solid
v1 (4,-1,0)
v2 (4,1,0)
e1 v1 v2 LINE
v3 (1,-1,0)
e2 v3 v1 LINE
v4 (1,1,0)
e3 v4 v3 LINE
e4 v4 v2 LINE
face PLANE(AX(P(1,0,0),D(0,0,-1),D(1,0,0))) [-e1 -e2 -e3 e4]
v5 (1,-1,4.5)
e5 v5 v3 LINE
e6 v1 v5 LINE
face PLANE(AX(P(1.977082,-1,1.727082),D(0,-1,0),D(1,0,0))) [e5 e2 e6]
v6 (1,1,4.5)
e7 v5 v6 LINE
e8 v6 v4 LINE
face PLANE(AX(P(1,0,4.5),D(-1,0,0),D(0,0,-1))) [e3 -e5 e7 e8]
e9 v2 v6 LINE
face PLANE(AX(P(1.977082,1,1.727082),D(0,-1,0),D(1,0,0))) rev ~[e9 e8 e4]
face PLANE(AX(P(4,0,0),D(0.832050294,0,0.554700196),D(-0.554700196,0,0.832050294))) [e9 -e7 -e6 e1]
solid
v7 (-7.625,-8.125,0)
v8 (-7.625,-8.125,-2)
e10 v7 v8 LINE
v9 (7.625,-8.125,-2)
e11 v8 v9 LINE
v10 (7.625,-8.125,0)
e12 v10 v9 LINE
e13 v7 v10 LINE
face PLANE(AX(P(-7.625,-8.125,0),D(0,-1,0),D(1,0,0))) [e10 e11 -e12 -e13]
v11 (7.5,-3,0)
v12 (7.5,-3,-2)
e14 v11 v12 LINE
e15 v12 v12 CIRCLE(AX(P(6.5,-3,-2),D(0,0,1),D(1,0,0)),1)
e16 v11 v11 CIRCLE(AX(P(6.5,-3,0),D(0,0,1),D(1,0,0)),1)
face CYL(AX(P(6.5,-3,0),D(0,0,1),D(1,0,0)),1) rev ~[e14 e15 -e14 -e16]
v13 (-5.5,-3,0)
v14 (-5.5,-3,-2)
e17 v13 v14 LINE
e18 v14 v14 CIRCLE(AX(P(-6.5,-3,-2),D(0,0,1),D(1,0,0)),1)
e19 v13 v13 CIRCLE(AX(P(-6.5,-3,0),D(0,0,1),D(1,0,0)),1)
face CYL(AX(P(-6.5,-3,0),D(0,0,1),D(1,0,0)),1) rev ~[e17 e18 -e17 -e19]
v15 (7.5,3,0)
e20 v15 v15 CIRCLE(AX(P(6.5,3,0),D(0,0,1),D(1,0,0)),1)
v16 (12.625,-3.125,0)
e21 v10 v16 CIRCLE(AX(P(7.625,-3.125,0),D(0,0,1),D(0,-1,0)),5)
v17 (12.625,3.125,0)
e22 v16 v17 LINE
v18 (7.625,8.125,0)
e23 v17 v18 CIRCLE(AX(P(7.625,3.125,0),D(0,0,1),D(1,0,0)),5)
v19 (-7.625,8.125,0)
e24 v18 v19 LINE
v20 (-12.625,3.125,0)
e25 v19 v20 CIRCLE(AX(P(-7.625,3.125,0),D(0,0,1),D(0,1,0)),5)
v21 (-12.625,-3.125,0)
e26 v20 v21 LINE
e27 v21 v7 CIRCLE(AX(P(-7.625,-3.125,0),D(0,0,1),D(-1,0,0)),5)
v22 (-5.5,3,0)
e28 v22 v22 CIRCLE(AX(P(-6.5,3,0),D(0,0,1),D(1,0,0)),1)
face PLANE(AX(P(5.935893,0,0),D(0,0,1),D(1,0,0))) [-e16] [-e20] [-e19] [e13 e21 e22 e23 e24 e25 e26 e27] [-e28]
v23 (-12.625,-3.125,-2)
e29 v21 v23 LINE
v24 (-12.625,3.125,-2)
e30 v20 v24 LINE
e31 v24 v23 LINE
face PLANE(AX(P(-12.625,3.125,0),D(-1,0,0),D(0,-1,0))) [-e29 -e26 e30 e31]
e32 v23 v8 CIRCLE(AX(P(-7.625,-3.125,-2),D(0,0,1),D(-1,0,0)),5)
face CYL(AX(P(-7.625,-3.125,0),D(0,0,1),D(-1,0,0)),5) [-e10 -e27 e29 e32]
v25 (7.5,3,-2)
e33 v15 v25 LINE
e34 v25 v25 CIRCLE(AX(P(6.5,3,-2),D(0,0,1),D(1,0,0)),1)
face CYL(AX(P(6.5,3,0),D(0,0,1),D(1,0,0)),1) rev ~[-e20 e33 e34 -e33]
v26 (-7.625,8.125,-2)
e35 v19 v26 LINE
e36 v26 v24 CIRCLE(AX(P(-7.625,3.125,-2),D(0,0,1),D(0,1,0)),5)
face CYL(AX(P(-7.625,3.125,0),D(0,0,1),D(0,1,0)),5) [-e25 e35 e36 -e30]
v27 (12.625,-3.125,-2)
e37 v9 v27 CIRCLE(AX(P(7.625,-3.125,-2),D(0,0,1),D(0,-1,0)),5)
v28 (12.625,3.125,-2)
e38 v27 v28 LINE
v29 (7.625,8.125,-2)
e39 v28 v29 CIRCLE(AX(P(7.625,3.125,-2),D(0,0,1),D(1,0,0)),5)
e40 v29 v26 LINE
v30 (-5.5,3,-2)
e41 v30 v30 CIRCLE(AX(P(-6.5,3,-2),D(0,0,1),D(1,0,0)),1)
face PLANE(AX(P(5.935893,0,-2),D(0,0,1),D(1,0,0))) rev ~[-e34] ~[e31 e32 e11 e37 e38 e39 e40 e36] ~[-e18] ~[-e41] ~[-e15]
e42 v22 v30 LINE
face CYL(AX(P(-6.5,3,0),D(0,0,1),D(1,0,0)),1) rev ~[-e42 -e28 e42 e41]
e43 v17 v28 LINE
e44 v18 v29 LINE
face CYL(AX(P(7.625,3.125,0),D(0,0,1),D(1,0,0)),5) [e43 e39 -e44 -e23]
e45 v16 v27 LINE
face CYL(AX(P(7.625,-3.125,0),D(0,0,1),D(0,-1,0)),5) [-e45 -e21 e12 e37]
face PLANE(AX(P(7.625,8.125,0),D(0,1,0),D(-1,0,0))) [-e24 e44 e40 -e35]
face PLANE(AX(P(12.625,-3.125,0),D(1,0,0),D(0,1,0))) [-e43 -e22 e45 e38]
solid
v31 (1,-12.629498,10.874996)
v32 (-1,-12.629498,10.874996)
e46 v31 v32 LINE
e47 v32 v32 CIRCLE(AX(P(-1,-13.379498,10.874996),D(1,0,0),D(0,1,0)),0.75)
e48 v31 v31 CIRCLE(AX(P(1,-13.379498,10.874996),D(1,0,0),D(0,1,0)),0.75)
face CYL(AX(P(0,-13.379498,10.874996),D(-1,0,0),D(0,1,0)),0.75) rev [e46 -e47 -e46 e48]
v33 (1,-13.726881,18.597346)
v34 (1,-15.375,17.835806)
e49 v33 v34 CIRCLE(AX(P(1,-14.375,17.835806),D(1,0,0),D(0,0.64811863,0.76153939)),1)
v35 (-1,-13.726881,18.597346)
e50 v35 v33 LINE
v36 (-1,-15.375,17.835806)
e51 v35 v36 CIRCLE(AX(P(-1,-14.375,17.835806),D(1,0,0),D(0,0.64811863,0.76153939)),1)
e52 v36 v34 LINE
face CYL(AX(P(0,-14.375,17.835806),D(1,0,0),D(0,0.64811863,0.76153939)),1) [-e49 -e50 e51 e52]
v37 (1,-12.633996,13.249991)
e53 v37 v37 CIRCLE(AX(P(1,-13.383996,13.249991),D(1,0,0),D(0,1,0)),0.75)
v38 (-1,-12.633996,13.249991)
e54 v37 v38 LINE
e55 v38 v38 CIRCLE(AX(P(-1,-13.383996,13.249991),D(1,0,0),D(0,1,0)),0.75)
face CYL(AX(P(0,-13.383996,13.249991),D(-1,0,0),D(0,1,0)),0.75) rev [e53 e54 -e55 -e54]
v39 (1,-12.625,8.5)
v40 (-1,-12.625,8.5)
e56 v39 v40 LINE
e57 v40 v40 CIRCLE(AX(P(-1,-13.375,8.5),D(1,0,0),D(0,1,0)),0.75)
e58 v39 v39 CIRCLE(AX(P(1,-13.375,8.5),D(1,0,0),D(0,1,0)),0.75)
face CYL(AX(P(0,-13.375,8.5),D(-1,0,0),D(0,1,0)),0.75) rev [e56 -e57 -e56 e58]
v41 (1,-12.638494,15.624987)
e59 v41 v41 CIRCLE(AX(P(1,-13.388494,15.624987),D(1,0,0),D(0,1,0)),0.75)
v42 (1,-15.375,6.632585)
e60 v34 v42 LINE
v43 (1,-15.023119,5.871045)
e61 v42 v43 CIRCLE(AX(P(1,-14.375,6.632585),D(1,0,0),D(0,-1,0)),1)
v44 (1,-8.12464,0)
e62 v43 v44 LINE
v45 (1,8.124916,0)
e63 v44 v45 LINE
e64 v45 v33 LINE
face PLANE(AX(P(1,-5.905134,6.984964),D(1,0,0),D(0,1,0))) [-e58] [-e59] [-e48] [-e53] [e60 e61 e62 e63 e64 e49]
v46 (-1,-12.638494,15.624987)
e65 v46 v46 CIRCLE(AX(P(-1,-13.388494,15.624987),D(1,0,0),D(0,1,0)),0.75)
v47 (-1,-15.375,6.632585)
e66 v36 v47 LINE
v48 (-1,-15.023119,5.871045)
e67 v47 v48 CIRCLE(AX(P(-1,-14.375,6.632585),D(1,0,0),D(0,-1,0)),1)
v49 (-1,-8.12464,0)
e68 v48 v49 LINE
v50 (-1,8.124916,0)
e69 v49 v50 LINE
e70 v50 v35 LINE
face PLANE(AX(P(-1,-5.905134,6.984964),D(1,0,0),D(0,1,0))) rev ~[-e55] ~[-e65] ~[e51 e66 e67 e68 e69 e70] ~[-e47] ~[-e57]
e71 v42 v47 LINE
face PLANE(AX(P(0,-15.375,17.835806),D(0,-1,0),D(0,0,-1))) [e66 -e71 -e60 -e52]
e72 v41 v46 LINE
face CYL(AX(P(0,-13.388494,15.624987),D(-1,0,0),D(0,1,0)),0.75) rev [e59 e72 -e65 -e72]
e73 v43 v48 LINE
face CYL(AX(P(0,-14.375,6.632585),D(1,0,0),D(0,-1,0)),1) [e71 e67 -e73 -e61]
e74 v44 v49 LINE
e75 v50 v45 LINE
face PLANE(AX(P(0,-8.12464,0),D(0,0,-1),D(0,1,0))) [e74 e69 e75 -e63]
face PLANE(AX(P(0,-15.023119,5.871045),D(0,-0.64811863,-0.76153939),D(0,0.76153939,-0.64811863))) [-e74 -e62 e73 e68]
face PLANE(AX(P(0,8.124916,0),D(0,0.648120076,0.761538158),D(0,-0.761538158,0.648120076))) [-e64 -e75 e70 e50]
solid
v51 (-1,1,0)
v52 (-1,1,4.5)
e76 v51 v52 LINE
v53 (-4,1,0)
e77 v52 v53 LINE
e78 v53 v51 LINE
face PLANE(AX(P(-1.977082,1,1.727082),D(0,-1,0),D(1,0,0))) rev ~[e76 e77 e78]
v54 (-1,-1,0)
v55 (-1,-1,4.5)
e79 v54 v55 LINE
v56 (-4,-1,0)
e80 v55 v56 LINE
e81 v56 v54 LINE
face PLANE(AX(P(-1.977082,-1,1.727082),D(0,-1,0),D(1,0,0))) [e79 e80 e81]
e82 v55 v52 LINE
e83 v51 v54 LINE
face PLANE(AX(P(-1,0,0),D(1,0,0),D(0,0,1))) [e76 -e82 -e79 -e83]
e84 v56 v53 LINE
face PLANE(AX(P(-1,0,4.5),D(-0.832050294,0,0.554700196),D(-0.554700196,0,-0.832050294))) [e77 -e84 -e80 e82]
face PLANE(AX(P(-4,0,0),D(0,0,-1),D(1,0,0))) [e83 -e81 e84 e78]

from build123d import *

# Parameters (mm, degrees)
F0_R     = 1
F0_W     = 2
F0_H     = 2
F0_H_2   = 7.125
F0_W_2   = 3
F1_DEPTH = 2
F2_R     = 0.75
F3_DEPTH = 1
F5_DEPTH = 1


# Not quite as in the source:
# - ends of sketch curves that miss each other by under 0.0002 mm in the source are joined


with BuildPart() as f1:
    # F0 (on Top) → F1 (new body)
    with BuildSketch(Plane.XY):
        with BuildLine():
            Line((6.5, -8.125), (7.625, -8.125))
            ThreePointArc((7.625, -8.125), (11.1605339059, -6.6605339059), (12.625, -3.125))
            Line((12.625, -3.125), (12.625, -3))
            Line((12.625, -3), (12.625, -1))
            Line((12.625, -1), (12.625, 1))
            Line((12.625, 1), (12.625, 3))
            Line((12.625, 3), (12.625, 3.125))
            ThreePointArc((12.625, 3.125), (11.1605339059, 6.6605339059), (7.625, 8.125))
            Line((7.625, 8.125), (6.5, 8.125))
            Line((6.5, 8.125), (1, 8.125))
            Line((1, 8.125), (1, 1))
            Line((1, 1), (4, 1))
            Line((4, 1), (4, -1))
            Line((4, -1), (1, -1))
            Line((1, -1), (1, -8.125))
            Line((1, -8.125), (6.5, -8.125))
        make_face()
        with Locations((6.5, -3)):
            Circle(F0_R, mode=Mode.SUBTRACT)
        with Locations((6.5, 3)):
            Circle(F0_R, mode=Mode.SUBTRACT)
        with BuildLine():
            Line((-6.5, -8.125), (-1, -8.125))
            Line((-1, -8.125), (-1, -1))
            Line((-1, -1), (-4, -1))
            Line((-4, -1), (-4, 1))
            Line((-4, 1), (-1, 1))
            Line((-1, 1), (-1, 8.125))
            Line((-1, 8.125), (-6.5, 8.125))
            Line((-6.5, 8.125), (-7.625, 8.125))
            ThreePointArc((-7.625, 8.125), (-11.1605339059, 6.6605339059), (-12.625, 3.125))
            Line((-12.625, 3.125), (-12.625, 3))
            Line((-12.625, 3), (-12.625, 1))
            Line((-12.625, 1), (-12.625, -1))
            Line((-12.625, -1), (-12.625, -3))
            Line((-12.625, -3), (-12.625, -3.125))
            ThreePointArc((-12.625, -3.125), (-11.1605339059, -6.6605339059), (-7.625, -8.125))
            Line((-7.625, -8.125), (-6.5, -8.125))
        make_face()
        with Locations((-6.5, -3)):
            Circle(F0_R, mode=Mode.SUBTRACT)
        with Locations((-6.5, 3)):
            Circle(F0_R, mode=Mode.SUBTRACT)
        Rectangle(F0_W, F0_H)
        with Locations((0, 4.5625)):
            Rectangle(F0_W, F0_H_2)
        with Locations((0, -4.5625)):
            Rectangle(F0_W, F0_H_2)
        with Locations((2.5, 0)):
            Rectangle(F0_W_2, F0_H)
        with Locations((-2.5, 0)):
            Rectangle(F0_W_2, F0_H)
    extrude(amount=-F1_DEPTH)


with BuildPart() as f3:
    # F2 (on Right) → F3 (new body, symmetric)
    with BuildSketch(Plane.YZ):
        with BuildLine():
            Line((-8.1246402115, 0), (0, 0))
            Line((0, 0), (8.1249158829, 0))
            Line((8.1249158829, 0), (-13.7268813705, 18.5973458472))
            ThreePointArc((-13.7268813705, 18.5973458472), (-14.7944528403, 18.7435835859), (-15.375, 17.8358064575))
            Line((-15.375, 17.8358064575), (-15.375, 6.6325848519))
            ThreePointArc((-15.375, 6.6325848519), (-15.2827771284, 6.2131320116), (-15.0231186295, 5.8710454622))
            Line((-15.0231186295, 5.8710454622), (-8.1246402115, 0))
        make_face()
        with Locations((-13.375, 8.5)):
            Circle(F2_R, mode=Mode.SUBTRACT)
        with Locations((-13.379498098, 10.8749957404)):
            Circle(F2_R, mode=Mode.SUBTRACT)
        with Locations((-13.383996196, 13.2499914809)):
            Circle(F2_R, mode=Mode.SUBTRACT)
        with Locations((-13.388494294, 15.6249872213)):
            Circle(F2_R, mode=Mode.SUBTRACT)
    extrude(amount=F3_DEPTH, both=True)


with BuildPart() as f5:
    # F4 (on Front) → F5 (new body, symmetric)
    with BuildSketch(Plane.XZ):
        Polygon((-4, 0), (-1, 0), (-1, 4.5), align=None)
    extrude(amount=F5_DEPTH, both=True)


with BuildPart() as f5b:
    # F4 (on Front) → F5, piece 2 (new body, symmetric)
    with BuildSketch(Plane.XZ):
        Polygon((1, 4.5), (1, 0), (4, 0), align=None)
    extrude(amount=F5_DEPTH, both=True)


solid = Compound([f1.part, f3.part, f5.part, f5b.part])
